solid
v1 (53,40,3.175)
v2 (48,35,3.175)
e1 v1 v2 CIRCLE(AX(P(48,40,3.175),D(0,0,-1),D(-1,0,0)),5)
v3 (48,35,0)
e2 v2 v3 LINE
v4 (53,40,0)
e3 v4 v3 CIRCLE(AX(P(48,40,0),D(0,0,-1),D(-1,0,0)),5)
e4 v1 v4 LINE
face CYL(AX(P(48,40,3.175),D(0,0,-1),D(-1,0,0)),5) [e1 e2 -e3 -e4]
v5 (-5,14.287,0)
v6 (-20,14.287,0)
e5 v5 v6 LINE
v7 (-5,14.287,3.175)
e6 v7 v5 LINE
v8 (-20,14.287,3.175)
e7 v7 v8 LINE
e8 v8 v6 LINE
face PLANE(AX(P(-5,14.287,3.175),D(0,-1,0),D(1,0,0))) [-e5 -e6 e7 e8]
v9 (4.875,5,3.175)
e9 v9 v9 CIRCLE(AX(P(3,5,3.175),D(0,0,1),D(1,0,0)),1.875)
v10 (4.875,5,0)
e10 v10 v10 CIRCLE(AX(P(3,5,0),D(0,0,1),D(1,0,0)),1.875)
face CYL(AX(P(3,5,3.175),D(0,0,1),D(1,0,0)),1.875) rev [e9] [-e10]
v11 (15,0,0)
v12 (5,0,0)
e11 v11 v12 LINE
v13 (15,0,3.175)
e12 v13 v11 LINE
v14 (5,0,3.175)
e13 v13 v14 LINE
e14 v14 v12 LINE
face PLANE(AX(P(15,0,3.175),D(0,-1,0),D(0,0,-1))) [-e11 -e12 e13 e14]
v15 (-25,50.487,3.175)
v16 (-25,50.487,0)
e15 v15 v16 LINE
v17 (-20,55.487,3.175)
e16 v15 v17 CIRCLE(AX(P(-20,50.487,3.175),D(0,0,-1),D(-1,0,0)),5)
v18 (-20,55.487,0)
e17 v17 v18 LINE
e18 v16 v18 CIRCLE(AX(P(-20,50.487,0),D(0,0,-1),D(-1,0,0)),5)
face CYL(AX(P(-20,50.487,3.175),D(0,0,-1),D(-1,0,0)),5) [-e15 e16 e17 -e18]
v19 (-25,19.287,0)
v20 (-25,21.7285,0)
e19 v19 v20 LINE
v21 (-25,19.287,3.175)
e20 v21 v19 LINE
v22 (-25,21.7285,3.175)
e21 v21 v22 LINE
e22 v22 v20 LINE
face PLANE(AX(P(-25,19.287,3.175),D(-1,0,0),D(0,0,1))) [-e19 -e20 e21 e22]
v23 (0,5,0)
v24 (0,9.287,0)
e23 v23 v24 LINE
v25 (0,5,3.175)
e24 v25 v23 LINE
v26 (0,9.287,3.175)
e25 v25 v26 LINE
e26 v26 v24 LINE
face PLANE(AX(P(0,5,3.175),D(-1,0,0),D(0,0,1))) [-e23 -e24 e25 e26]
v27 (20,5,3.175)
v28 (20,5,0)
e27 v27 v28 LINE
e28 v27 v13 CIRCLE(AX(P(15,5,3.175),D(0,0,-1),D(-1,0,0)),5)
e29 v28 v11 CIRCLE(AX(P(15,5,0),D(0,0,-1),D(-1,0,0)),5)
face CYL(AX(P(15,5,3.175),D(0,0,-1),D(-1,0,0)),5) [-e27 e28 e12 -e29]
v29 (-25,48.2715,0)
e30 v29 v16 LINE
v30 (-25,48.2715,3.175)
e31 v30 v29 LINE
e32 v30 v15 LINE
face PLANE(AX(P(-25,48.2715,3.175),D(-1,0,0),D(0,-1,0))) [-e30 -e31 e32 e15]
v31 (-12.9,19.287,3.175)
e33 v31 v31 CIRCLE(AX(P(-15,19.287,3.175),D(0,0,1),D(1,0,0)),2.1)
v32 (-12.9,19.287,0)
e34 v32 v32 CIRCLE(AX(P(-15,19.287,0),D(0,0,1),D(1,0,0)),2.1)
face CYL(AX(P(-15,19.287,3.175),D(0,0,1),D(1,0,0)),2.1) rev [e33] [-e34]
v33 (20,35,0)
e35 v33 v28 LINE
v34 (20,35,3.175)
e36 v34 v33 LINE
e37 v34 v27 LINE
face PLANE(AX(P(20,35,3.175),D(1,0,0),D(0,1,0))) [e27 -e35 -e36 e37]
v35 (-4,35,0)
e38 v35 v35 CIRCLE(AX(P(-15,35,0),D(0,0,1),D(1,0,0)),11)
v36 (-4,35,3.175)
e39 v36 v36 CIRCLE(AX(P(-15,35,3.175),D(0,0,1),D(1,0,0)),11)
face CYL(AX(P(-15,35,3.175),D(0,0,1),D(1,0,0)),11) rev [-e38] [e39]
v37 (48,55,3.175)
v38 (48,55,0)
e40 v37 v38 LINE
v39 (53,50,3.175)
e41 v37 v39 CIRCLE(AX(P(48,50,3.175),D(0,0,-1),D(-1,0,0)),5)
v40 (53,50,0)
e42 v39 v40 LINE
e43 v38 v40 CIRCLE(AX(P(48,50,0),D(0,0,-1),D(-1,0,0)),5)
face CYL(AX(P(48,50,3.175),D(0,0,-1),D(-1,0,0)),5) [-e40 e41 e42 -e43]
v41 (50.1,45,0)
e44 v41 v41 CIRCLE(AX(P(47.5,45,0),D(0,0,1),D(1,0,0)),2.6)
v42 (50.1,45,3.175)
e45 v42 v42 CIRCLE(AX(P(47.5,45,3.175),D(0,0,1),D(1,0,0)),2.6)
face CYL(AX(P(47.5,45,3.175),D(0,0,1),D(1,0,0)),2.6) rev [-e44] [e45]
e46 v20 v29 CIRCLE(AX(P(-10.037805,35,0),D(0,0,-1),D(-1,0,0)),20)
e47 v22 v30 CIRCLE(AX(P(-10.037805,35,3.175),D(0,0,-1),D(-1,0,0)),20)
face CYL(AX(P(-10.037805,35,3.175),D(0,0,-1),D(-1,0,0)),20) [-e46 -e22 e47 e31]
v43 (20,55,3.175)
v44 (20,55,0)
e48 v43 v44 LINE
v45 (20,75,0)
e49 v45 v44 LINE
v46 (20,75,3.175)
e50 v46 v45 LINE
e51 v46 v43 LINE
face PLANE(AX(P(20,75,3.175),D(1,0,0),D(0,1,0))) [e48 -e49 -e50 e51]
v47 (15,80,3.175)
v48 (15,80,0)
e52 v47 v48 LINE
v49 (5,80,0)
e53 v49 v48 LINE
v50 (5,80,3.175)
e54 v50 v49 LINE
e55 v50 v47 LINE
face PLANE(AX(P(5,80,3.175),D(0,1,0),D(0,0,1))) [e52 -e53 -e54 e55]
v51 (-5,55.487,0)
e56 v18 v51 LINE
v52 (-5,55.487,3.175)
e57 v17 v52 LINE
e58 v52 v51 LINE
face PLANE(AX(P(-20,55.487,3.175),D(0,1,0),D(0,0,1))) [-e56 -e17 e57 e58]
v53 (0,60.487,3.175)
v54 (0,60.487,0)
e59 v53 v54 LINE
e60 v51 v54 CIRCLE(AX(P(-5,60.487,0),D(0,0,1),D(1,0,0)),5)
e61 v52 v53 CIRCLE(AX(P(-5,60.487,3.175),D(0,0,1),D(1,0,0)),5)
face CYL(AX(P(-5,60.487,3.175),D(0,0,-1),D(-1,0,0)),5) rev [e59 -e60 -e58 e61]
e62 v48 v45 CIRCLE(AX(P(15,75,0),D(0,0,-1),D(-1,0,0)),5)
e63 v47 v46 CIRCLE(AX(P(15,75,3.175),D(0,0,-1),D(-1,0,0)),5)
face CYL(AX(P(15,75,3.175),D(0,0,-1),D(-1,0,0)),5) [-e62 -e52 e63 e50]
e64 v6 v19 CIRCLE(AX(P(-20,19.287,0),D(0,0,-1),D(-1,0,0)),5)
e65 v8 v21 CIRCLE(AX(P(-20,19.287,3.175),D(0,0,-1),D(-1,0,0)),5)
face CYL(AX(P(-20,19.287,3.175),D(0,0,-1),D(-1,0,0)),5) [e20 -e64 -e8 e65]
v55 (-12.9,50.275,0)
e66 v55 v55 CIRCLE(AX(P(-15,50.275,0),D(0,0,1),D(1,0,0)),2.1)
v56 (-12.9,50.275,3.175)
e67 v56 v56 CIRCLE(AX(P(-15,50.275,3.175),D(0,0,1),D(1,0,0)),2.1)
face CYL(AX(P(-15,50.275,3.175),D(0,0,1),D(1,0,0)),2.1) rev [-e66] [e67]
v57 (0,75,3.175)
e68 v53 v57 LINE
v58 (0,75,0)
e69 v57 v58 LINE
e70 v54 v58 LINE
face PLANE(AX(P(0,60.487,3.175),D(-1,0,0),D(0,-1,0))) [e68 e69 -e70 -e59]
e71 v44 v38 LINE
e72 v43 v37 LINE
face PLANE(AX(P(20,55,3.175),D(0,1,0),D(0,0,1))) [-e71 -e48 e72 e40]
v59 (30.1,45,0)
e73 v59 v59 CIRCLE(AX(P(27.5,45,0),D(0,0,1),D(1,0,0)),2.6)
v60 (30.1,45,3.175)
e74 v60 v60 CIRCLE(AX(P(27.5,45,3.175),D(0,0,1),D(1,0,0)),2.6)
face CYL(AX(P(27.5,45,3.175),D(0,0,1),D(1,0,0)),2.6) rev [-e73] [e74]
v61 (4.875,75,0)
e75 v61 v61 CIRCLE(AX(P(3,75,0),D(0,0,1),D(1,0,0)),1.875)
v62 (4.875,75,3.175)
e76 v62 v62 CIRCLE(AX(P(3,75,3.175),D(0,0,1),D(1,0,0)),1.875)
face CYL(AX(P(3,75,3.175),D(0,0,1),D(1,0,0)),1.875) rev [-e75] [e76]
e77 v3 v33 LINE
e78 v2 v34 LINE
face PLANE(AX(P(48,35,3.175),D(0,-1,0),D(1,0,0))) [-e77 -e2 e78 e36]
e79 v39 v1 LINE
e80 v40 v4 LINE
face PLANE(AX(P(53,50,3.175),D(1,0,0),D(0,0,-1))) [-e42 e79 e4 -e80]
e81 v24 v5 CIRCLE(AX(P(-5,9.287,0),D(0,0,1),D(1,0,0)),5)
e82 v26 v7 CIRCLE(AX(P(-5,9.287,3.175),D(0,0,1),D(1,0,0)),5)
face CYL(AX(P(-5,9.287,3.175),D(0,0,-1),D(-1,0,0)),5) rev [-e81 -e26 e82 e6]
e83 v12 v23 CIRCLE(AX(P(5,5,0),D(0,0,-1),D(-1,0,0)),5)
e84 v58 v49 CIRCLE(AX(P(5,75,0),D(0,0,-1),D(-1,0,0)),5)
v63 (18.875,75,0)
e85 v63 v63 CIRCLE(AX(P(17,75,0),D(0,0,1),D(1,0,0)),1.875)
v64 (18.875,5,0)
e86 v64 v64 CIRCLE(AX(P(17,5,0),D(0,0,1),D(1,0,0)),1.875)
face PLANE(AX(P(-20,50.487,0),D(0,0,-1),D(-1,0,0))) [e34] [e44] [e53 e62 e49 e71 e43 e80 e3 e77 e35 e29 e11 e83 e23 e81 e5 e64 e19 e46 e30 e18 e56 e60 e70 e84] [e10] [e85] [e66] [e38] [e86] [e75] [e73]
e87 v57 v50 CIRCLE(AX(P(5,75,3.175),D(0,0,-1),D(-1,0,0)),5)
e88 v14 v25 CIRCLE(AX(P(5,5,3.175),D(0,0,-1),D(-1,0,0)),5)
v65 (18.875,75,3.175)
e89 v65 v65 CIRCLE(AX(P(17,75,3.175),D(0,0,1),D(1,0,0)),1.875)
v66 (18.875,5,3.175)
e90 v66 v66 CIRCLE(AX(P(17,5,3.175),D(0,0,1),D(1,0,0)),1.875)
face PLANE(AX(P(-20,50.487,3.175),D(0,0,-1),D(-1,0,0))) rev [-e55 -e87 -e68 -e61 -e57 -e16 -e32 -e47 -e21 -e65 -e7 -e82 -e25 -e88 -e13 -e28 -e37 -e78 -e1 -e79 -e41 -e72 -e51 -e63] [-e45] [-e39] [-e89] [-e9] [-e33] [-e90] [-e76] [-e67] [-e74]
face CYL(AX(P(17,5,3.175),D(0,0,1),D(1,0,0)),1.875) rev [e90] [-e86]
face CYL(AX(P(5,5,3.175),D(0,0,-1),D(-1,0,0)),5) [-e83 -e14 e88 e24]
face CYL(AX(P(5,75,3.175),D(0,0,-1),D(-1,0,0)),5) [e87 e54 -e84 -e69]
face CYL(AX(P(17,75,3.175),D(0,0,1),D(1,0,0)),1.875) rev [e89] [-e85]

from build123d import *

# Parameters (mm, degrees)
BASE_FLANGE1_DEPTH         = 3.175
M3_5_CLEARANCE_HOLE1_D     = 3.75
F_5_2_5_2_DIAMETER_HOLE1_D = 5.2
F_4_2_4_2_DIAMETER_HOLE1_D = 4.2
F_22_0_22_DIAMETER_HOLE1_D = 22


# Sheet-metal steps are written as plain solids
with BuildPart() as part:
    # Sketch11 → Base-Flange1 (new body)
    with BuildSketch(Plane(origin=(0, 0, 0), x_dir=(-1, 0, 0), z_dir=(0, 0, -1))):
        with BuildLine():
            Line((20, 55.487), (5, 55.487))
            ThreePointArc((5, 55.487), (1.464466094, 56.951466094), (0, 60.487))
            Line((0, 60.487), (0, 75))
            ThreePointArc((0, 75), (-1.464466094, 78.535533906), (-5, 80))
            Line((-5, 80), (-15, 80))
            ThreePointArc((-15, 80), (-18.535533906, 78.535533906), (-20, 75))
            Line((-20, 75), (-20, 55))
            Line((-20, 55), (-48, 55))
            ThreePointArc((-48, 55), (-51.535533906, 53.535533906), (-53, 50))
            Line((-53, 50), (-53, 40))
            ThreePointArc((-53, 40), (-51.535533906, 36.464466094), (-48, 35))
            Line((-48, 35), (-20, 35))
            Line((-20, 35), (-20, 5))
            ThreePointArc((-20, 5), (-18.535533906, 1.464466094), (-15, 0))
            Line((-15, 0), (-5, 0))
            ThreePointArc((-5, 0), (-1.464466094, 1.464466094), (0, 5))
            Line((0, 5), (0, 9.287))
            ThreePointArc((0, 9.287), (1.464466094, 12.822533906), (5, 14.287))
            Line((5, 14.287), (20, 14.287))
            ThreePointArc((20, 14.287), (23.535533906, 15.751466094), (25, 19.287))
            Line((25, 19.287), (25, 21.728499788))
            ThreePointArc((25, 21.728499788), (30.037804903, 35), (25, 48.271500212))
            Line((25, 48.271500212), (25, 50.487))
            ThreePointArc((25, 50.487), (23.535533906, 54.022533906), (20, 55.487))
        make_face()
    extrude(amount=-BASE_FLANGE1_DEPTH)

    # M3.5 Clearance Hole1 (through all)
    with Locations(Plane.XY.offset(3.175)):
        with Locations((17, 5), (3, 75), (3, 5), (17, 75)):
            Hole(M3_5_CLEARANCE_HOLE1_D / 2)

    # Ø5.2 (5.2) Diameter Hole1 (through all)
    with Locations(Plane.XY.offset(3.175)):
        with Locations((27.5, 45), (47.5, 45)):
            Hole(F_5_2_5_2_DIAMETER_HOLE1_D / 2)

    # Ø4.2 (4.2) Diameter Hole1 (through all)
    with Locations(Plane.XY.offset(3.175)):
        with Locations((-15, 19.287), (-15, 50.275)):
            Hole(F_4_2_4_2_DIAMETER_HOLE1_D / 2)

    # Ø22.0 (22) Diameter Hole1 (through all)
    with Locations(Plane.XY.offset(3.175)):
        with Locations((-15, 35)):
            Hole(F_22_0_22_DIAMETER_HOLE1_D / 2)


solid = part.part
